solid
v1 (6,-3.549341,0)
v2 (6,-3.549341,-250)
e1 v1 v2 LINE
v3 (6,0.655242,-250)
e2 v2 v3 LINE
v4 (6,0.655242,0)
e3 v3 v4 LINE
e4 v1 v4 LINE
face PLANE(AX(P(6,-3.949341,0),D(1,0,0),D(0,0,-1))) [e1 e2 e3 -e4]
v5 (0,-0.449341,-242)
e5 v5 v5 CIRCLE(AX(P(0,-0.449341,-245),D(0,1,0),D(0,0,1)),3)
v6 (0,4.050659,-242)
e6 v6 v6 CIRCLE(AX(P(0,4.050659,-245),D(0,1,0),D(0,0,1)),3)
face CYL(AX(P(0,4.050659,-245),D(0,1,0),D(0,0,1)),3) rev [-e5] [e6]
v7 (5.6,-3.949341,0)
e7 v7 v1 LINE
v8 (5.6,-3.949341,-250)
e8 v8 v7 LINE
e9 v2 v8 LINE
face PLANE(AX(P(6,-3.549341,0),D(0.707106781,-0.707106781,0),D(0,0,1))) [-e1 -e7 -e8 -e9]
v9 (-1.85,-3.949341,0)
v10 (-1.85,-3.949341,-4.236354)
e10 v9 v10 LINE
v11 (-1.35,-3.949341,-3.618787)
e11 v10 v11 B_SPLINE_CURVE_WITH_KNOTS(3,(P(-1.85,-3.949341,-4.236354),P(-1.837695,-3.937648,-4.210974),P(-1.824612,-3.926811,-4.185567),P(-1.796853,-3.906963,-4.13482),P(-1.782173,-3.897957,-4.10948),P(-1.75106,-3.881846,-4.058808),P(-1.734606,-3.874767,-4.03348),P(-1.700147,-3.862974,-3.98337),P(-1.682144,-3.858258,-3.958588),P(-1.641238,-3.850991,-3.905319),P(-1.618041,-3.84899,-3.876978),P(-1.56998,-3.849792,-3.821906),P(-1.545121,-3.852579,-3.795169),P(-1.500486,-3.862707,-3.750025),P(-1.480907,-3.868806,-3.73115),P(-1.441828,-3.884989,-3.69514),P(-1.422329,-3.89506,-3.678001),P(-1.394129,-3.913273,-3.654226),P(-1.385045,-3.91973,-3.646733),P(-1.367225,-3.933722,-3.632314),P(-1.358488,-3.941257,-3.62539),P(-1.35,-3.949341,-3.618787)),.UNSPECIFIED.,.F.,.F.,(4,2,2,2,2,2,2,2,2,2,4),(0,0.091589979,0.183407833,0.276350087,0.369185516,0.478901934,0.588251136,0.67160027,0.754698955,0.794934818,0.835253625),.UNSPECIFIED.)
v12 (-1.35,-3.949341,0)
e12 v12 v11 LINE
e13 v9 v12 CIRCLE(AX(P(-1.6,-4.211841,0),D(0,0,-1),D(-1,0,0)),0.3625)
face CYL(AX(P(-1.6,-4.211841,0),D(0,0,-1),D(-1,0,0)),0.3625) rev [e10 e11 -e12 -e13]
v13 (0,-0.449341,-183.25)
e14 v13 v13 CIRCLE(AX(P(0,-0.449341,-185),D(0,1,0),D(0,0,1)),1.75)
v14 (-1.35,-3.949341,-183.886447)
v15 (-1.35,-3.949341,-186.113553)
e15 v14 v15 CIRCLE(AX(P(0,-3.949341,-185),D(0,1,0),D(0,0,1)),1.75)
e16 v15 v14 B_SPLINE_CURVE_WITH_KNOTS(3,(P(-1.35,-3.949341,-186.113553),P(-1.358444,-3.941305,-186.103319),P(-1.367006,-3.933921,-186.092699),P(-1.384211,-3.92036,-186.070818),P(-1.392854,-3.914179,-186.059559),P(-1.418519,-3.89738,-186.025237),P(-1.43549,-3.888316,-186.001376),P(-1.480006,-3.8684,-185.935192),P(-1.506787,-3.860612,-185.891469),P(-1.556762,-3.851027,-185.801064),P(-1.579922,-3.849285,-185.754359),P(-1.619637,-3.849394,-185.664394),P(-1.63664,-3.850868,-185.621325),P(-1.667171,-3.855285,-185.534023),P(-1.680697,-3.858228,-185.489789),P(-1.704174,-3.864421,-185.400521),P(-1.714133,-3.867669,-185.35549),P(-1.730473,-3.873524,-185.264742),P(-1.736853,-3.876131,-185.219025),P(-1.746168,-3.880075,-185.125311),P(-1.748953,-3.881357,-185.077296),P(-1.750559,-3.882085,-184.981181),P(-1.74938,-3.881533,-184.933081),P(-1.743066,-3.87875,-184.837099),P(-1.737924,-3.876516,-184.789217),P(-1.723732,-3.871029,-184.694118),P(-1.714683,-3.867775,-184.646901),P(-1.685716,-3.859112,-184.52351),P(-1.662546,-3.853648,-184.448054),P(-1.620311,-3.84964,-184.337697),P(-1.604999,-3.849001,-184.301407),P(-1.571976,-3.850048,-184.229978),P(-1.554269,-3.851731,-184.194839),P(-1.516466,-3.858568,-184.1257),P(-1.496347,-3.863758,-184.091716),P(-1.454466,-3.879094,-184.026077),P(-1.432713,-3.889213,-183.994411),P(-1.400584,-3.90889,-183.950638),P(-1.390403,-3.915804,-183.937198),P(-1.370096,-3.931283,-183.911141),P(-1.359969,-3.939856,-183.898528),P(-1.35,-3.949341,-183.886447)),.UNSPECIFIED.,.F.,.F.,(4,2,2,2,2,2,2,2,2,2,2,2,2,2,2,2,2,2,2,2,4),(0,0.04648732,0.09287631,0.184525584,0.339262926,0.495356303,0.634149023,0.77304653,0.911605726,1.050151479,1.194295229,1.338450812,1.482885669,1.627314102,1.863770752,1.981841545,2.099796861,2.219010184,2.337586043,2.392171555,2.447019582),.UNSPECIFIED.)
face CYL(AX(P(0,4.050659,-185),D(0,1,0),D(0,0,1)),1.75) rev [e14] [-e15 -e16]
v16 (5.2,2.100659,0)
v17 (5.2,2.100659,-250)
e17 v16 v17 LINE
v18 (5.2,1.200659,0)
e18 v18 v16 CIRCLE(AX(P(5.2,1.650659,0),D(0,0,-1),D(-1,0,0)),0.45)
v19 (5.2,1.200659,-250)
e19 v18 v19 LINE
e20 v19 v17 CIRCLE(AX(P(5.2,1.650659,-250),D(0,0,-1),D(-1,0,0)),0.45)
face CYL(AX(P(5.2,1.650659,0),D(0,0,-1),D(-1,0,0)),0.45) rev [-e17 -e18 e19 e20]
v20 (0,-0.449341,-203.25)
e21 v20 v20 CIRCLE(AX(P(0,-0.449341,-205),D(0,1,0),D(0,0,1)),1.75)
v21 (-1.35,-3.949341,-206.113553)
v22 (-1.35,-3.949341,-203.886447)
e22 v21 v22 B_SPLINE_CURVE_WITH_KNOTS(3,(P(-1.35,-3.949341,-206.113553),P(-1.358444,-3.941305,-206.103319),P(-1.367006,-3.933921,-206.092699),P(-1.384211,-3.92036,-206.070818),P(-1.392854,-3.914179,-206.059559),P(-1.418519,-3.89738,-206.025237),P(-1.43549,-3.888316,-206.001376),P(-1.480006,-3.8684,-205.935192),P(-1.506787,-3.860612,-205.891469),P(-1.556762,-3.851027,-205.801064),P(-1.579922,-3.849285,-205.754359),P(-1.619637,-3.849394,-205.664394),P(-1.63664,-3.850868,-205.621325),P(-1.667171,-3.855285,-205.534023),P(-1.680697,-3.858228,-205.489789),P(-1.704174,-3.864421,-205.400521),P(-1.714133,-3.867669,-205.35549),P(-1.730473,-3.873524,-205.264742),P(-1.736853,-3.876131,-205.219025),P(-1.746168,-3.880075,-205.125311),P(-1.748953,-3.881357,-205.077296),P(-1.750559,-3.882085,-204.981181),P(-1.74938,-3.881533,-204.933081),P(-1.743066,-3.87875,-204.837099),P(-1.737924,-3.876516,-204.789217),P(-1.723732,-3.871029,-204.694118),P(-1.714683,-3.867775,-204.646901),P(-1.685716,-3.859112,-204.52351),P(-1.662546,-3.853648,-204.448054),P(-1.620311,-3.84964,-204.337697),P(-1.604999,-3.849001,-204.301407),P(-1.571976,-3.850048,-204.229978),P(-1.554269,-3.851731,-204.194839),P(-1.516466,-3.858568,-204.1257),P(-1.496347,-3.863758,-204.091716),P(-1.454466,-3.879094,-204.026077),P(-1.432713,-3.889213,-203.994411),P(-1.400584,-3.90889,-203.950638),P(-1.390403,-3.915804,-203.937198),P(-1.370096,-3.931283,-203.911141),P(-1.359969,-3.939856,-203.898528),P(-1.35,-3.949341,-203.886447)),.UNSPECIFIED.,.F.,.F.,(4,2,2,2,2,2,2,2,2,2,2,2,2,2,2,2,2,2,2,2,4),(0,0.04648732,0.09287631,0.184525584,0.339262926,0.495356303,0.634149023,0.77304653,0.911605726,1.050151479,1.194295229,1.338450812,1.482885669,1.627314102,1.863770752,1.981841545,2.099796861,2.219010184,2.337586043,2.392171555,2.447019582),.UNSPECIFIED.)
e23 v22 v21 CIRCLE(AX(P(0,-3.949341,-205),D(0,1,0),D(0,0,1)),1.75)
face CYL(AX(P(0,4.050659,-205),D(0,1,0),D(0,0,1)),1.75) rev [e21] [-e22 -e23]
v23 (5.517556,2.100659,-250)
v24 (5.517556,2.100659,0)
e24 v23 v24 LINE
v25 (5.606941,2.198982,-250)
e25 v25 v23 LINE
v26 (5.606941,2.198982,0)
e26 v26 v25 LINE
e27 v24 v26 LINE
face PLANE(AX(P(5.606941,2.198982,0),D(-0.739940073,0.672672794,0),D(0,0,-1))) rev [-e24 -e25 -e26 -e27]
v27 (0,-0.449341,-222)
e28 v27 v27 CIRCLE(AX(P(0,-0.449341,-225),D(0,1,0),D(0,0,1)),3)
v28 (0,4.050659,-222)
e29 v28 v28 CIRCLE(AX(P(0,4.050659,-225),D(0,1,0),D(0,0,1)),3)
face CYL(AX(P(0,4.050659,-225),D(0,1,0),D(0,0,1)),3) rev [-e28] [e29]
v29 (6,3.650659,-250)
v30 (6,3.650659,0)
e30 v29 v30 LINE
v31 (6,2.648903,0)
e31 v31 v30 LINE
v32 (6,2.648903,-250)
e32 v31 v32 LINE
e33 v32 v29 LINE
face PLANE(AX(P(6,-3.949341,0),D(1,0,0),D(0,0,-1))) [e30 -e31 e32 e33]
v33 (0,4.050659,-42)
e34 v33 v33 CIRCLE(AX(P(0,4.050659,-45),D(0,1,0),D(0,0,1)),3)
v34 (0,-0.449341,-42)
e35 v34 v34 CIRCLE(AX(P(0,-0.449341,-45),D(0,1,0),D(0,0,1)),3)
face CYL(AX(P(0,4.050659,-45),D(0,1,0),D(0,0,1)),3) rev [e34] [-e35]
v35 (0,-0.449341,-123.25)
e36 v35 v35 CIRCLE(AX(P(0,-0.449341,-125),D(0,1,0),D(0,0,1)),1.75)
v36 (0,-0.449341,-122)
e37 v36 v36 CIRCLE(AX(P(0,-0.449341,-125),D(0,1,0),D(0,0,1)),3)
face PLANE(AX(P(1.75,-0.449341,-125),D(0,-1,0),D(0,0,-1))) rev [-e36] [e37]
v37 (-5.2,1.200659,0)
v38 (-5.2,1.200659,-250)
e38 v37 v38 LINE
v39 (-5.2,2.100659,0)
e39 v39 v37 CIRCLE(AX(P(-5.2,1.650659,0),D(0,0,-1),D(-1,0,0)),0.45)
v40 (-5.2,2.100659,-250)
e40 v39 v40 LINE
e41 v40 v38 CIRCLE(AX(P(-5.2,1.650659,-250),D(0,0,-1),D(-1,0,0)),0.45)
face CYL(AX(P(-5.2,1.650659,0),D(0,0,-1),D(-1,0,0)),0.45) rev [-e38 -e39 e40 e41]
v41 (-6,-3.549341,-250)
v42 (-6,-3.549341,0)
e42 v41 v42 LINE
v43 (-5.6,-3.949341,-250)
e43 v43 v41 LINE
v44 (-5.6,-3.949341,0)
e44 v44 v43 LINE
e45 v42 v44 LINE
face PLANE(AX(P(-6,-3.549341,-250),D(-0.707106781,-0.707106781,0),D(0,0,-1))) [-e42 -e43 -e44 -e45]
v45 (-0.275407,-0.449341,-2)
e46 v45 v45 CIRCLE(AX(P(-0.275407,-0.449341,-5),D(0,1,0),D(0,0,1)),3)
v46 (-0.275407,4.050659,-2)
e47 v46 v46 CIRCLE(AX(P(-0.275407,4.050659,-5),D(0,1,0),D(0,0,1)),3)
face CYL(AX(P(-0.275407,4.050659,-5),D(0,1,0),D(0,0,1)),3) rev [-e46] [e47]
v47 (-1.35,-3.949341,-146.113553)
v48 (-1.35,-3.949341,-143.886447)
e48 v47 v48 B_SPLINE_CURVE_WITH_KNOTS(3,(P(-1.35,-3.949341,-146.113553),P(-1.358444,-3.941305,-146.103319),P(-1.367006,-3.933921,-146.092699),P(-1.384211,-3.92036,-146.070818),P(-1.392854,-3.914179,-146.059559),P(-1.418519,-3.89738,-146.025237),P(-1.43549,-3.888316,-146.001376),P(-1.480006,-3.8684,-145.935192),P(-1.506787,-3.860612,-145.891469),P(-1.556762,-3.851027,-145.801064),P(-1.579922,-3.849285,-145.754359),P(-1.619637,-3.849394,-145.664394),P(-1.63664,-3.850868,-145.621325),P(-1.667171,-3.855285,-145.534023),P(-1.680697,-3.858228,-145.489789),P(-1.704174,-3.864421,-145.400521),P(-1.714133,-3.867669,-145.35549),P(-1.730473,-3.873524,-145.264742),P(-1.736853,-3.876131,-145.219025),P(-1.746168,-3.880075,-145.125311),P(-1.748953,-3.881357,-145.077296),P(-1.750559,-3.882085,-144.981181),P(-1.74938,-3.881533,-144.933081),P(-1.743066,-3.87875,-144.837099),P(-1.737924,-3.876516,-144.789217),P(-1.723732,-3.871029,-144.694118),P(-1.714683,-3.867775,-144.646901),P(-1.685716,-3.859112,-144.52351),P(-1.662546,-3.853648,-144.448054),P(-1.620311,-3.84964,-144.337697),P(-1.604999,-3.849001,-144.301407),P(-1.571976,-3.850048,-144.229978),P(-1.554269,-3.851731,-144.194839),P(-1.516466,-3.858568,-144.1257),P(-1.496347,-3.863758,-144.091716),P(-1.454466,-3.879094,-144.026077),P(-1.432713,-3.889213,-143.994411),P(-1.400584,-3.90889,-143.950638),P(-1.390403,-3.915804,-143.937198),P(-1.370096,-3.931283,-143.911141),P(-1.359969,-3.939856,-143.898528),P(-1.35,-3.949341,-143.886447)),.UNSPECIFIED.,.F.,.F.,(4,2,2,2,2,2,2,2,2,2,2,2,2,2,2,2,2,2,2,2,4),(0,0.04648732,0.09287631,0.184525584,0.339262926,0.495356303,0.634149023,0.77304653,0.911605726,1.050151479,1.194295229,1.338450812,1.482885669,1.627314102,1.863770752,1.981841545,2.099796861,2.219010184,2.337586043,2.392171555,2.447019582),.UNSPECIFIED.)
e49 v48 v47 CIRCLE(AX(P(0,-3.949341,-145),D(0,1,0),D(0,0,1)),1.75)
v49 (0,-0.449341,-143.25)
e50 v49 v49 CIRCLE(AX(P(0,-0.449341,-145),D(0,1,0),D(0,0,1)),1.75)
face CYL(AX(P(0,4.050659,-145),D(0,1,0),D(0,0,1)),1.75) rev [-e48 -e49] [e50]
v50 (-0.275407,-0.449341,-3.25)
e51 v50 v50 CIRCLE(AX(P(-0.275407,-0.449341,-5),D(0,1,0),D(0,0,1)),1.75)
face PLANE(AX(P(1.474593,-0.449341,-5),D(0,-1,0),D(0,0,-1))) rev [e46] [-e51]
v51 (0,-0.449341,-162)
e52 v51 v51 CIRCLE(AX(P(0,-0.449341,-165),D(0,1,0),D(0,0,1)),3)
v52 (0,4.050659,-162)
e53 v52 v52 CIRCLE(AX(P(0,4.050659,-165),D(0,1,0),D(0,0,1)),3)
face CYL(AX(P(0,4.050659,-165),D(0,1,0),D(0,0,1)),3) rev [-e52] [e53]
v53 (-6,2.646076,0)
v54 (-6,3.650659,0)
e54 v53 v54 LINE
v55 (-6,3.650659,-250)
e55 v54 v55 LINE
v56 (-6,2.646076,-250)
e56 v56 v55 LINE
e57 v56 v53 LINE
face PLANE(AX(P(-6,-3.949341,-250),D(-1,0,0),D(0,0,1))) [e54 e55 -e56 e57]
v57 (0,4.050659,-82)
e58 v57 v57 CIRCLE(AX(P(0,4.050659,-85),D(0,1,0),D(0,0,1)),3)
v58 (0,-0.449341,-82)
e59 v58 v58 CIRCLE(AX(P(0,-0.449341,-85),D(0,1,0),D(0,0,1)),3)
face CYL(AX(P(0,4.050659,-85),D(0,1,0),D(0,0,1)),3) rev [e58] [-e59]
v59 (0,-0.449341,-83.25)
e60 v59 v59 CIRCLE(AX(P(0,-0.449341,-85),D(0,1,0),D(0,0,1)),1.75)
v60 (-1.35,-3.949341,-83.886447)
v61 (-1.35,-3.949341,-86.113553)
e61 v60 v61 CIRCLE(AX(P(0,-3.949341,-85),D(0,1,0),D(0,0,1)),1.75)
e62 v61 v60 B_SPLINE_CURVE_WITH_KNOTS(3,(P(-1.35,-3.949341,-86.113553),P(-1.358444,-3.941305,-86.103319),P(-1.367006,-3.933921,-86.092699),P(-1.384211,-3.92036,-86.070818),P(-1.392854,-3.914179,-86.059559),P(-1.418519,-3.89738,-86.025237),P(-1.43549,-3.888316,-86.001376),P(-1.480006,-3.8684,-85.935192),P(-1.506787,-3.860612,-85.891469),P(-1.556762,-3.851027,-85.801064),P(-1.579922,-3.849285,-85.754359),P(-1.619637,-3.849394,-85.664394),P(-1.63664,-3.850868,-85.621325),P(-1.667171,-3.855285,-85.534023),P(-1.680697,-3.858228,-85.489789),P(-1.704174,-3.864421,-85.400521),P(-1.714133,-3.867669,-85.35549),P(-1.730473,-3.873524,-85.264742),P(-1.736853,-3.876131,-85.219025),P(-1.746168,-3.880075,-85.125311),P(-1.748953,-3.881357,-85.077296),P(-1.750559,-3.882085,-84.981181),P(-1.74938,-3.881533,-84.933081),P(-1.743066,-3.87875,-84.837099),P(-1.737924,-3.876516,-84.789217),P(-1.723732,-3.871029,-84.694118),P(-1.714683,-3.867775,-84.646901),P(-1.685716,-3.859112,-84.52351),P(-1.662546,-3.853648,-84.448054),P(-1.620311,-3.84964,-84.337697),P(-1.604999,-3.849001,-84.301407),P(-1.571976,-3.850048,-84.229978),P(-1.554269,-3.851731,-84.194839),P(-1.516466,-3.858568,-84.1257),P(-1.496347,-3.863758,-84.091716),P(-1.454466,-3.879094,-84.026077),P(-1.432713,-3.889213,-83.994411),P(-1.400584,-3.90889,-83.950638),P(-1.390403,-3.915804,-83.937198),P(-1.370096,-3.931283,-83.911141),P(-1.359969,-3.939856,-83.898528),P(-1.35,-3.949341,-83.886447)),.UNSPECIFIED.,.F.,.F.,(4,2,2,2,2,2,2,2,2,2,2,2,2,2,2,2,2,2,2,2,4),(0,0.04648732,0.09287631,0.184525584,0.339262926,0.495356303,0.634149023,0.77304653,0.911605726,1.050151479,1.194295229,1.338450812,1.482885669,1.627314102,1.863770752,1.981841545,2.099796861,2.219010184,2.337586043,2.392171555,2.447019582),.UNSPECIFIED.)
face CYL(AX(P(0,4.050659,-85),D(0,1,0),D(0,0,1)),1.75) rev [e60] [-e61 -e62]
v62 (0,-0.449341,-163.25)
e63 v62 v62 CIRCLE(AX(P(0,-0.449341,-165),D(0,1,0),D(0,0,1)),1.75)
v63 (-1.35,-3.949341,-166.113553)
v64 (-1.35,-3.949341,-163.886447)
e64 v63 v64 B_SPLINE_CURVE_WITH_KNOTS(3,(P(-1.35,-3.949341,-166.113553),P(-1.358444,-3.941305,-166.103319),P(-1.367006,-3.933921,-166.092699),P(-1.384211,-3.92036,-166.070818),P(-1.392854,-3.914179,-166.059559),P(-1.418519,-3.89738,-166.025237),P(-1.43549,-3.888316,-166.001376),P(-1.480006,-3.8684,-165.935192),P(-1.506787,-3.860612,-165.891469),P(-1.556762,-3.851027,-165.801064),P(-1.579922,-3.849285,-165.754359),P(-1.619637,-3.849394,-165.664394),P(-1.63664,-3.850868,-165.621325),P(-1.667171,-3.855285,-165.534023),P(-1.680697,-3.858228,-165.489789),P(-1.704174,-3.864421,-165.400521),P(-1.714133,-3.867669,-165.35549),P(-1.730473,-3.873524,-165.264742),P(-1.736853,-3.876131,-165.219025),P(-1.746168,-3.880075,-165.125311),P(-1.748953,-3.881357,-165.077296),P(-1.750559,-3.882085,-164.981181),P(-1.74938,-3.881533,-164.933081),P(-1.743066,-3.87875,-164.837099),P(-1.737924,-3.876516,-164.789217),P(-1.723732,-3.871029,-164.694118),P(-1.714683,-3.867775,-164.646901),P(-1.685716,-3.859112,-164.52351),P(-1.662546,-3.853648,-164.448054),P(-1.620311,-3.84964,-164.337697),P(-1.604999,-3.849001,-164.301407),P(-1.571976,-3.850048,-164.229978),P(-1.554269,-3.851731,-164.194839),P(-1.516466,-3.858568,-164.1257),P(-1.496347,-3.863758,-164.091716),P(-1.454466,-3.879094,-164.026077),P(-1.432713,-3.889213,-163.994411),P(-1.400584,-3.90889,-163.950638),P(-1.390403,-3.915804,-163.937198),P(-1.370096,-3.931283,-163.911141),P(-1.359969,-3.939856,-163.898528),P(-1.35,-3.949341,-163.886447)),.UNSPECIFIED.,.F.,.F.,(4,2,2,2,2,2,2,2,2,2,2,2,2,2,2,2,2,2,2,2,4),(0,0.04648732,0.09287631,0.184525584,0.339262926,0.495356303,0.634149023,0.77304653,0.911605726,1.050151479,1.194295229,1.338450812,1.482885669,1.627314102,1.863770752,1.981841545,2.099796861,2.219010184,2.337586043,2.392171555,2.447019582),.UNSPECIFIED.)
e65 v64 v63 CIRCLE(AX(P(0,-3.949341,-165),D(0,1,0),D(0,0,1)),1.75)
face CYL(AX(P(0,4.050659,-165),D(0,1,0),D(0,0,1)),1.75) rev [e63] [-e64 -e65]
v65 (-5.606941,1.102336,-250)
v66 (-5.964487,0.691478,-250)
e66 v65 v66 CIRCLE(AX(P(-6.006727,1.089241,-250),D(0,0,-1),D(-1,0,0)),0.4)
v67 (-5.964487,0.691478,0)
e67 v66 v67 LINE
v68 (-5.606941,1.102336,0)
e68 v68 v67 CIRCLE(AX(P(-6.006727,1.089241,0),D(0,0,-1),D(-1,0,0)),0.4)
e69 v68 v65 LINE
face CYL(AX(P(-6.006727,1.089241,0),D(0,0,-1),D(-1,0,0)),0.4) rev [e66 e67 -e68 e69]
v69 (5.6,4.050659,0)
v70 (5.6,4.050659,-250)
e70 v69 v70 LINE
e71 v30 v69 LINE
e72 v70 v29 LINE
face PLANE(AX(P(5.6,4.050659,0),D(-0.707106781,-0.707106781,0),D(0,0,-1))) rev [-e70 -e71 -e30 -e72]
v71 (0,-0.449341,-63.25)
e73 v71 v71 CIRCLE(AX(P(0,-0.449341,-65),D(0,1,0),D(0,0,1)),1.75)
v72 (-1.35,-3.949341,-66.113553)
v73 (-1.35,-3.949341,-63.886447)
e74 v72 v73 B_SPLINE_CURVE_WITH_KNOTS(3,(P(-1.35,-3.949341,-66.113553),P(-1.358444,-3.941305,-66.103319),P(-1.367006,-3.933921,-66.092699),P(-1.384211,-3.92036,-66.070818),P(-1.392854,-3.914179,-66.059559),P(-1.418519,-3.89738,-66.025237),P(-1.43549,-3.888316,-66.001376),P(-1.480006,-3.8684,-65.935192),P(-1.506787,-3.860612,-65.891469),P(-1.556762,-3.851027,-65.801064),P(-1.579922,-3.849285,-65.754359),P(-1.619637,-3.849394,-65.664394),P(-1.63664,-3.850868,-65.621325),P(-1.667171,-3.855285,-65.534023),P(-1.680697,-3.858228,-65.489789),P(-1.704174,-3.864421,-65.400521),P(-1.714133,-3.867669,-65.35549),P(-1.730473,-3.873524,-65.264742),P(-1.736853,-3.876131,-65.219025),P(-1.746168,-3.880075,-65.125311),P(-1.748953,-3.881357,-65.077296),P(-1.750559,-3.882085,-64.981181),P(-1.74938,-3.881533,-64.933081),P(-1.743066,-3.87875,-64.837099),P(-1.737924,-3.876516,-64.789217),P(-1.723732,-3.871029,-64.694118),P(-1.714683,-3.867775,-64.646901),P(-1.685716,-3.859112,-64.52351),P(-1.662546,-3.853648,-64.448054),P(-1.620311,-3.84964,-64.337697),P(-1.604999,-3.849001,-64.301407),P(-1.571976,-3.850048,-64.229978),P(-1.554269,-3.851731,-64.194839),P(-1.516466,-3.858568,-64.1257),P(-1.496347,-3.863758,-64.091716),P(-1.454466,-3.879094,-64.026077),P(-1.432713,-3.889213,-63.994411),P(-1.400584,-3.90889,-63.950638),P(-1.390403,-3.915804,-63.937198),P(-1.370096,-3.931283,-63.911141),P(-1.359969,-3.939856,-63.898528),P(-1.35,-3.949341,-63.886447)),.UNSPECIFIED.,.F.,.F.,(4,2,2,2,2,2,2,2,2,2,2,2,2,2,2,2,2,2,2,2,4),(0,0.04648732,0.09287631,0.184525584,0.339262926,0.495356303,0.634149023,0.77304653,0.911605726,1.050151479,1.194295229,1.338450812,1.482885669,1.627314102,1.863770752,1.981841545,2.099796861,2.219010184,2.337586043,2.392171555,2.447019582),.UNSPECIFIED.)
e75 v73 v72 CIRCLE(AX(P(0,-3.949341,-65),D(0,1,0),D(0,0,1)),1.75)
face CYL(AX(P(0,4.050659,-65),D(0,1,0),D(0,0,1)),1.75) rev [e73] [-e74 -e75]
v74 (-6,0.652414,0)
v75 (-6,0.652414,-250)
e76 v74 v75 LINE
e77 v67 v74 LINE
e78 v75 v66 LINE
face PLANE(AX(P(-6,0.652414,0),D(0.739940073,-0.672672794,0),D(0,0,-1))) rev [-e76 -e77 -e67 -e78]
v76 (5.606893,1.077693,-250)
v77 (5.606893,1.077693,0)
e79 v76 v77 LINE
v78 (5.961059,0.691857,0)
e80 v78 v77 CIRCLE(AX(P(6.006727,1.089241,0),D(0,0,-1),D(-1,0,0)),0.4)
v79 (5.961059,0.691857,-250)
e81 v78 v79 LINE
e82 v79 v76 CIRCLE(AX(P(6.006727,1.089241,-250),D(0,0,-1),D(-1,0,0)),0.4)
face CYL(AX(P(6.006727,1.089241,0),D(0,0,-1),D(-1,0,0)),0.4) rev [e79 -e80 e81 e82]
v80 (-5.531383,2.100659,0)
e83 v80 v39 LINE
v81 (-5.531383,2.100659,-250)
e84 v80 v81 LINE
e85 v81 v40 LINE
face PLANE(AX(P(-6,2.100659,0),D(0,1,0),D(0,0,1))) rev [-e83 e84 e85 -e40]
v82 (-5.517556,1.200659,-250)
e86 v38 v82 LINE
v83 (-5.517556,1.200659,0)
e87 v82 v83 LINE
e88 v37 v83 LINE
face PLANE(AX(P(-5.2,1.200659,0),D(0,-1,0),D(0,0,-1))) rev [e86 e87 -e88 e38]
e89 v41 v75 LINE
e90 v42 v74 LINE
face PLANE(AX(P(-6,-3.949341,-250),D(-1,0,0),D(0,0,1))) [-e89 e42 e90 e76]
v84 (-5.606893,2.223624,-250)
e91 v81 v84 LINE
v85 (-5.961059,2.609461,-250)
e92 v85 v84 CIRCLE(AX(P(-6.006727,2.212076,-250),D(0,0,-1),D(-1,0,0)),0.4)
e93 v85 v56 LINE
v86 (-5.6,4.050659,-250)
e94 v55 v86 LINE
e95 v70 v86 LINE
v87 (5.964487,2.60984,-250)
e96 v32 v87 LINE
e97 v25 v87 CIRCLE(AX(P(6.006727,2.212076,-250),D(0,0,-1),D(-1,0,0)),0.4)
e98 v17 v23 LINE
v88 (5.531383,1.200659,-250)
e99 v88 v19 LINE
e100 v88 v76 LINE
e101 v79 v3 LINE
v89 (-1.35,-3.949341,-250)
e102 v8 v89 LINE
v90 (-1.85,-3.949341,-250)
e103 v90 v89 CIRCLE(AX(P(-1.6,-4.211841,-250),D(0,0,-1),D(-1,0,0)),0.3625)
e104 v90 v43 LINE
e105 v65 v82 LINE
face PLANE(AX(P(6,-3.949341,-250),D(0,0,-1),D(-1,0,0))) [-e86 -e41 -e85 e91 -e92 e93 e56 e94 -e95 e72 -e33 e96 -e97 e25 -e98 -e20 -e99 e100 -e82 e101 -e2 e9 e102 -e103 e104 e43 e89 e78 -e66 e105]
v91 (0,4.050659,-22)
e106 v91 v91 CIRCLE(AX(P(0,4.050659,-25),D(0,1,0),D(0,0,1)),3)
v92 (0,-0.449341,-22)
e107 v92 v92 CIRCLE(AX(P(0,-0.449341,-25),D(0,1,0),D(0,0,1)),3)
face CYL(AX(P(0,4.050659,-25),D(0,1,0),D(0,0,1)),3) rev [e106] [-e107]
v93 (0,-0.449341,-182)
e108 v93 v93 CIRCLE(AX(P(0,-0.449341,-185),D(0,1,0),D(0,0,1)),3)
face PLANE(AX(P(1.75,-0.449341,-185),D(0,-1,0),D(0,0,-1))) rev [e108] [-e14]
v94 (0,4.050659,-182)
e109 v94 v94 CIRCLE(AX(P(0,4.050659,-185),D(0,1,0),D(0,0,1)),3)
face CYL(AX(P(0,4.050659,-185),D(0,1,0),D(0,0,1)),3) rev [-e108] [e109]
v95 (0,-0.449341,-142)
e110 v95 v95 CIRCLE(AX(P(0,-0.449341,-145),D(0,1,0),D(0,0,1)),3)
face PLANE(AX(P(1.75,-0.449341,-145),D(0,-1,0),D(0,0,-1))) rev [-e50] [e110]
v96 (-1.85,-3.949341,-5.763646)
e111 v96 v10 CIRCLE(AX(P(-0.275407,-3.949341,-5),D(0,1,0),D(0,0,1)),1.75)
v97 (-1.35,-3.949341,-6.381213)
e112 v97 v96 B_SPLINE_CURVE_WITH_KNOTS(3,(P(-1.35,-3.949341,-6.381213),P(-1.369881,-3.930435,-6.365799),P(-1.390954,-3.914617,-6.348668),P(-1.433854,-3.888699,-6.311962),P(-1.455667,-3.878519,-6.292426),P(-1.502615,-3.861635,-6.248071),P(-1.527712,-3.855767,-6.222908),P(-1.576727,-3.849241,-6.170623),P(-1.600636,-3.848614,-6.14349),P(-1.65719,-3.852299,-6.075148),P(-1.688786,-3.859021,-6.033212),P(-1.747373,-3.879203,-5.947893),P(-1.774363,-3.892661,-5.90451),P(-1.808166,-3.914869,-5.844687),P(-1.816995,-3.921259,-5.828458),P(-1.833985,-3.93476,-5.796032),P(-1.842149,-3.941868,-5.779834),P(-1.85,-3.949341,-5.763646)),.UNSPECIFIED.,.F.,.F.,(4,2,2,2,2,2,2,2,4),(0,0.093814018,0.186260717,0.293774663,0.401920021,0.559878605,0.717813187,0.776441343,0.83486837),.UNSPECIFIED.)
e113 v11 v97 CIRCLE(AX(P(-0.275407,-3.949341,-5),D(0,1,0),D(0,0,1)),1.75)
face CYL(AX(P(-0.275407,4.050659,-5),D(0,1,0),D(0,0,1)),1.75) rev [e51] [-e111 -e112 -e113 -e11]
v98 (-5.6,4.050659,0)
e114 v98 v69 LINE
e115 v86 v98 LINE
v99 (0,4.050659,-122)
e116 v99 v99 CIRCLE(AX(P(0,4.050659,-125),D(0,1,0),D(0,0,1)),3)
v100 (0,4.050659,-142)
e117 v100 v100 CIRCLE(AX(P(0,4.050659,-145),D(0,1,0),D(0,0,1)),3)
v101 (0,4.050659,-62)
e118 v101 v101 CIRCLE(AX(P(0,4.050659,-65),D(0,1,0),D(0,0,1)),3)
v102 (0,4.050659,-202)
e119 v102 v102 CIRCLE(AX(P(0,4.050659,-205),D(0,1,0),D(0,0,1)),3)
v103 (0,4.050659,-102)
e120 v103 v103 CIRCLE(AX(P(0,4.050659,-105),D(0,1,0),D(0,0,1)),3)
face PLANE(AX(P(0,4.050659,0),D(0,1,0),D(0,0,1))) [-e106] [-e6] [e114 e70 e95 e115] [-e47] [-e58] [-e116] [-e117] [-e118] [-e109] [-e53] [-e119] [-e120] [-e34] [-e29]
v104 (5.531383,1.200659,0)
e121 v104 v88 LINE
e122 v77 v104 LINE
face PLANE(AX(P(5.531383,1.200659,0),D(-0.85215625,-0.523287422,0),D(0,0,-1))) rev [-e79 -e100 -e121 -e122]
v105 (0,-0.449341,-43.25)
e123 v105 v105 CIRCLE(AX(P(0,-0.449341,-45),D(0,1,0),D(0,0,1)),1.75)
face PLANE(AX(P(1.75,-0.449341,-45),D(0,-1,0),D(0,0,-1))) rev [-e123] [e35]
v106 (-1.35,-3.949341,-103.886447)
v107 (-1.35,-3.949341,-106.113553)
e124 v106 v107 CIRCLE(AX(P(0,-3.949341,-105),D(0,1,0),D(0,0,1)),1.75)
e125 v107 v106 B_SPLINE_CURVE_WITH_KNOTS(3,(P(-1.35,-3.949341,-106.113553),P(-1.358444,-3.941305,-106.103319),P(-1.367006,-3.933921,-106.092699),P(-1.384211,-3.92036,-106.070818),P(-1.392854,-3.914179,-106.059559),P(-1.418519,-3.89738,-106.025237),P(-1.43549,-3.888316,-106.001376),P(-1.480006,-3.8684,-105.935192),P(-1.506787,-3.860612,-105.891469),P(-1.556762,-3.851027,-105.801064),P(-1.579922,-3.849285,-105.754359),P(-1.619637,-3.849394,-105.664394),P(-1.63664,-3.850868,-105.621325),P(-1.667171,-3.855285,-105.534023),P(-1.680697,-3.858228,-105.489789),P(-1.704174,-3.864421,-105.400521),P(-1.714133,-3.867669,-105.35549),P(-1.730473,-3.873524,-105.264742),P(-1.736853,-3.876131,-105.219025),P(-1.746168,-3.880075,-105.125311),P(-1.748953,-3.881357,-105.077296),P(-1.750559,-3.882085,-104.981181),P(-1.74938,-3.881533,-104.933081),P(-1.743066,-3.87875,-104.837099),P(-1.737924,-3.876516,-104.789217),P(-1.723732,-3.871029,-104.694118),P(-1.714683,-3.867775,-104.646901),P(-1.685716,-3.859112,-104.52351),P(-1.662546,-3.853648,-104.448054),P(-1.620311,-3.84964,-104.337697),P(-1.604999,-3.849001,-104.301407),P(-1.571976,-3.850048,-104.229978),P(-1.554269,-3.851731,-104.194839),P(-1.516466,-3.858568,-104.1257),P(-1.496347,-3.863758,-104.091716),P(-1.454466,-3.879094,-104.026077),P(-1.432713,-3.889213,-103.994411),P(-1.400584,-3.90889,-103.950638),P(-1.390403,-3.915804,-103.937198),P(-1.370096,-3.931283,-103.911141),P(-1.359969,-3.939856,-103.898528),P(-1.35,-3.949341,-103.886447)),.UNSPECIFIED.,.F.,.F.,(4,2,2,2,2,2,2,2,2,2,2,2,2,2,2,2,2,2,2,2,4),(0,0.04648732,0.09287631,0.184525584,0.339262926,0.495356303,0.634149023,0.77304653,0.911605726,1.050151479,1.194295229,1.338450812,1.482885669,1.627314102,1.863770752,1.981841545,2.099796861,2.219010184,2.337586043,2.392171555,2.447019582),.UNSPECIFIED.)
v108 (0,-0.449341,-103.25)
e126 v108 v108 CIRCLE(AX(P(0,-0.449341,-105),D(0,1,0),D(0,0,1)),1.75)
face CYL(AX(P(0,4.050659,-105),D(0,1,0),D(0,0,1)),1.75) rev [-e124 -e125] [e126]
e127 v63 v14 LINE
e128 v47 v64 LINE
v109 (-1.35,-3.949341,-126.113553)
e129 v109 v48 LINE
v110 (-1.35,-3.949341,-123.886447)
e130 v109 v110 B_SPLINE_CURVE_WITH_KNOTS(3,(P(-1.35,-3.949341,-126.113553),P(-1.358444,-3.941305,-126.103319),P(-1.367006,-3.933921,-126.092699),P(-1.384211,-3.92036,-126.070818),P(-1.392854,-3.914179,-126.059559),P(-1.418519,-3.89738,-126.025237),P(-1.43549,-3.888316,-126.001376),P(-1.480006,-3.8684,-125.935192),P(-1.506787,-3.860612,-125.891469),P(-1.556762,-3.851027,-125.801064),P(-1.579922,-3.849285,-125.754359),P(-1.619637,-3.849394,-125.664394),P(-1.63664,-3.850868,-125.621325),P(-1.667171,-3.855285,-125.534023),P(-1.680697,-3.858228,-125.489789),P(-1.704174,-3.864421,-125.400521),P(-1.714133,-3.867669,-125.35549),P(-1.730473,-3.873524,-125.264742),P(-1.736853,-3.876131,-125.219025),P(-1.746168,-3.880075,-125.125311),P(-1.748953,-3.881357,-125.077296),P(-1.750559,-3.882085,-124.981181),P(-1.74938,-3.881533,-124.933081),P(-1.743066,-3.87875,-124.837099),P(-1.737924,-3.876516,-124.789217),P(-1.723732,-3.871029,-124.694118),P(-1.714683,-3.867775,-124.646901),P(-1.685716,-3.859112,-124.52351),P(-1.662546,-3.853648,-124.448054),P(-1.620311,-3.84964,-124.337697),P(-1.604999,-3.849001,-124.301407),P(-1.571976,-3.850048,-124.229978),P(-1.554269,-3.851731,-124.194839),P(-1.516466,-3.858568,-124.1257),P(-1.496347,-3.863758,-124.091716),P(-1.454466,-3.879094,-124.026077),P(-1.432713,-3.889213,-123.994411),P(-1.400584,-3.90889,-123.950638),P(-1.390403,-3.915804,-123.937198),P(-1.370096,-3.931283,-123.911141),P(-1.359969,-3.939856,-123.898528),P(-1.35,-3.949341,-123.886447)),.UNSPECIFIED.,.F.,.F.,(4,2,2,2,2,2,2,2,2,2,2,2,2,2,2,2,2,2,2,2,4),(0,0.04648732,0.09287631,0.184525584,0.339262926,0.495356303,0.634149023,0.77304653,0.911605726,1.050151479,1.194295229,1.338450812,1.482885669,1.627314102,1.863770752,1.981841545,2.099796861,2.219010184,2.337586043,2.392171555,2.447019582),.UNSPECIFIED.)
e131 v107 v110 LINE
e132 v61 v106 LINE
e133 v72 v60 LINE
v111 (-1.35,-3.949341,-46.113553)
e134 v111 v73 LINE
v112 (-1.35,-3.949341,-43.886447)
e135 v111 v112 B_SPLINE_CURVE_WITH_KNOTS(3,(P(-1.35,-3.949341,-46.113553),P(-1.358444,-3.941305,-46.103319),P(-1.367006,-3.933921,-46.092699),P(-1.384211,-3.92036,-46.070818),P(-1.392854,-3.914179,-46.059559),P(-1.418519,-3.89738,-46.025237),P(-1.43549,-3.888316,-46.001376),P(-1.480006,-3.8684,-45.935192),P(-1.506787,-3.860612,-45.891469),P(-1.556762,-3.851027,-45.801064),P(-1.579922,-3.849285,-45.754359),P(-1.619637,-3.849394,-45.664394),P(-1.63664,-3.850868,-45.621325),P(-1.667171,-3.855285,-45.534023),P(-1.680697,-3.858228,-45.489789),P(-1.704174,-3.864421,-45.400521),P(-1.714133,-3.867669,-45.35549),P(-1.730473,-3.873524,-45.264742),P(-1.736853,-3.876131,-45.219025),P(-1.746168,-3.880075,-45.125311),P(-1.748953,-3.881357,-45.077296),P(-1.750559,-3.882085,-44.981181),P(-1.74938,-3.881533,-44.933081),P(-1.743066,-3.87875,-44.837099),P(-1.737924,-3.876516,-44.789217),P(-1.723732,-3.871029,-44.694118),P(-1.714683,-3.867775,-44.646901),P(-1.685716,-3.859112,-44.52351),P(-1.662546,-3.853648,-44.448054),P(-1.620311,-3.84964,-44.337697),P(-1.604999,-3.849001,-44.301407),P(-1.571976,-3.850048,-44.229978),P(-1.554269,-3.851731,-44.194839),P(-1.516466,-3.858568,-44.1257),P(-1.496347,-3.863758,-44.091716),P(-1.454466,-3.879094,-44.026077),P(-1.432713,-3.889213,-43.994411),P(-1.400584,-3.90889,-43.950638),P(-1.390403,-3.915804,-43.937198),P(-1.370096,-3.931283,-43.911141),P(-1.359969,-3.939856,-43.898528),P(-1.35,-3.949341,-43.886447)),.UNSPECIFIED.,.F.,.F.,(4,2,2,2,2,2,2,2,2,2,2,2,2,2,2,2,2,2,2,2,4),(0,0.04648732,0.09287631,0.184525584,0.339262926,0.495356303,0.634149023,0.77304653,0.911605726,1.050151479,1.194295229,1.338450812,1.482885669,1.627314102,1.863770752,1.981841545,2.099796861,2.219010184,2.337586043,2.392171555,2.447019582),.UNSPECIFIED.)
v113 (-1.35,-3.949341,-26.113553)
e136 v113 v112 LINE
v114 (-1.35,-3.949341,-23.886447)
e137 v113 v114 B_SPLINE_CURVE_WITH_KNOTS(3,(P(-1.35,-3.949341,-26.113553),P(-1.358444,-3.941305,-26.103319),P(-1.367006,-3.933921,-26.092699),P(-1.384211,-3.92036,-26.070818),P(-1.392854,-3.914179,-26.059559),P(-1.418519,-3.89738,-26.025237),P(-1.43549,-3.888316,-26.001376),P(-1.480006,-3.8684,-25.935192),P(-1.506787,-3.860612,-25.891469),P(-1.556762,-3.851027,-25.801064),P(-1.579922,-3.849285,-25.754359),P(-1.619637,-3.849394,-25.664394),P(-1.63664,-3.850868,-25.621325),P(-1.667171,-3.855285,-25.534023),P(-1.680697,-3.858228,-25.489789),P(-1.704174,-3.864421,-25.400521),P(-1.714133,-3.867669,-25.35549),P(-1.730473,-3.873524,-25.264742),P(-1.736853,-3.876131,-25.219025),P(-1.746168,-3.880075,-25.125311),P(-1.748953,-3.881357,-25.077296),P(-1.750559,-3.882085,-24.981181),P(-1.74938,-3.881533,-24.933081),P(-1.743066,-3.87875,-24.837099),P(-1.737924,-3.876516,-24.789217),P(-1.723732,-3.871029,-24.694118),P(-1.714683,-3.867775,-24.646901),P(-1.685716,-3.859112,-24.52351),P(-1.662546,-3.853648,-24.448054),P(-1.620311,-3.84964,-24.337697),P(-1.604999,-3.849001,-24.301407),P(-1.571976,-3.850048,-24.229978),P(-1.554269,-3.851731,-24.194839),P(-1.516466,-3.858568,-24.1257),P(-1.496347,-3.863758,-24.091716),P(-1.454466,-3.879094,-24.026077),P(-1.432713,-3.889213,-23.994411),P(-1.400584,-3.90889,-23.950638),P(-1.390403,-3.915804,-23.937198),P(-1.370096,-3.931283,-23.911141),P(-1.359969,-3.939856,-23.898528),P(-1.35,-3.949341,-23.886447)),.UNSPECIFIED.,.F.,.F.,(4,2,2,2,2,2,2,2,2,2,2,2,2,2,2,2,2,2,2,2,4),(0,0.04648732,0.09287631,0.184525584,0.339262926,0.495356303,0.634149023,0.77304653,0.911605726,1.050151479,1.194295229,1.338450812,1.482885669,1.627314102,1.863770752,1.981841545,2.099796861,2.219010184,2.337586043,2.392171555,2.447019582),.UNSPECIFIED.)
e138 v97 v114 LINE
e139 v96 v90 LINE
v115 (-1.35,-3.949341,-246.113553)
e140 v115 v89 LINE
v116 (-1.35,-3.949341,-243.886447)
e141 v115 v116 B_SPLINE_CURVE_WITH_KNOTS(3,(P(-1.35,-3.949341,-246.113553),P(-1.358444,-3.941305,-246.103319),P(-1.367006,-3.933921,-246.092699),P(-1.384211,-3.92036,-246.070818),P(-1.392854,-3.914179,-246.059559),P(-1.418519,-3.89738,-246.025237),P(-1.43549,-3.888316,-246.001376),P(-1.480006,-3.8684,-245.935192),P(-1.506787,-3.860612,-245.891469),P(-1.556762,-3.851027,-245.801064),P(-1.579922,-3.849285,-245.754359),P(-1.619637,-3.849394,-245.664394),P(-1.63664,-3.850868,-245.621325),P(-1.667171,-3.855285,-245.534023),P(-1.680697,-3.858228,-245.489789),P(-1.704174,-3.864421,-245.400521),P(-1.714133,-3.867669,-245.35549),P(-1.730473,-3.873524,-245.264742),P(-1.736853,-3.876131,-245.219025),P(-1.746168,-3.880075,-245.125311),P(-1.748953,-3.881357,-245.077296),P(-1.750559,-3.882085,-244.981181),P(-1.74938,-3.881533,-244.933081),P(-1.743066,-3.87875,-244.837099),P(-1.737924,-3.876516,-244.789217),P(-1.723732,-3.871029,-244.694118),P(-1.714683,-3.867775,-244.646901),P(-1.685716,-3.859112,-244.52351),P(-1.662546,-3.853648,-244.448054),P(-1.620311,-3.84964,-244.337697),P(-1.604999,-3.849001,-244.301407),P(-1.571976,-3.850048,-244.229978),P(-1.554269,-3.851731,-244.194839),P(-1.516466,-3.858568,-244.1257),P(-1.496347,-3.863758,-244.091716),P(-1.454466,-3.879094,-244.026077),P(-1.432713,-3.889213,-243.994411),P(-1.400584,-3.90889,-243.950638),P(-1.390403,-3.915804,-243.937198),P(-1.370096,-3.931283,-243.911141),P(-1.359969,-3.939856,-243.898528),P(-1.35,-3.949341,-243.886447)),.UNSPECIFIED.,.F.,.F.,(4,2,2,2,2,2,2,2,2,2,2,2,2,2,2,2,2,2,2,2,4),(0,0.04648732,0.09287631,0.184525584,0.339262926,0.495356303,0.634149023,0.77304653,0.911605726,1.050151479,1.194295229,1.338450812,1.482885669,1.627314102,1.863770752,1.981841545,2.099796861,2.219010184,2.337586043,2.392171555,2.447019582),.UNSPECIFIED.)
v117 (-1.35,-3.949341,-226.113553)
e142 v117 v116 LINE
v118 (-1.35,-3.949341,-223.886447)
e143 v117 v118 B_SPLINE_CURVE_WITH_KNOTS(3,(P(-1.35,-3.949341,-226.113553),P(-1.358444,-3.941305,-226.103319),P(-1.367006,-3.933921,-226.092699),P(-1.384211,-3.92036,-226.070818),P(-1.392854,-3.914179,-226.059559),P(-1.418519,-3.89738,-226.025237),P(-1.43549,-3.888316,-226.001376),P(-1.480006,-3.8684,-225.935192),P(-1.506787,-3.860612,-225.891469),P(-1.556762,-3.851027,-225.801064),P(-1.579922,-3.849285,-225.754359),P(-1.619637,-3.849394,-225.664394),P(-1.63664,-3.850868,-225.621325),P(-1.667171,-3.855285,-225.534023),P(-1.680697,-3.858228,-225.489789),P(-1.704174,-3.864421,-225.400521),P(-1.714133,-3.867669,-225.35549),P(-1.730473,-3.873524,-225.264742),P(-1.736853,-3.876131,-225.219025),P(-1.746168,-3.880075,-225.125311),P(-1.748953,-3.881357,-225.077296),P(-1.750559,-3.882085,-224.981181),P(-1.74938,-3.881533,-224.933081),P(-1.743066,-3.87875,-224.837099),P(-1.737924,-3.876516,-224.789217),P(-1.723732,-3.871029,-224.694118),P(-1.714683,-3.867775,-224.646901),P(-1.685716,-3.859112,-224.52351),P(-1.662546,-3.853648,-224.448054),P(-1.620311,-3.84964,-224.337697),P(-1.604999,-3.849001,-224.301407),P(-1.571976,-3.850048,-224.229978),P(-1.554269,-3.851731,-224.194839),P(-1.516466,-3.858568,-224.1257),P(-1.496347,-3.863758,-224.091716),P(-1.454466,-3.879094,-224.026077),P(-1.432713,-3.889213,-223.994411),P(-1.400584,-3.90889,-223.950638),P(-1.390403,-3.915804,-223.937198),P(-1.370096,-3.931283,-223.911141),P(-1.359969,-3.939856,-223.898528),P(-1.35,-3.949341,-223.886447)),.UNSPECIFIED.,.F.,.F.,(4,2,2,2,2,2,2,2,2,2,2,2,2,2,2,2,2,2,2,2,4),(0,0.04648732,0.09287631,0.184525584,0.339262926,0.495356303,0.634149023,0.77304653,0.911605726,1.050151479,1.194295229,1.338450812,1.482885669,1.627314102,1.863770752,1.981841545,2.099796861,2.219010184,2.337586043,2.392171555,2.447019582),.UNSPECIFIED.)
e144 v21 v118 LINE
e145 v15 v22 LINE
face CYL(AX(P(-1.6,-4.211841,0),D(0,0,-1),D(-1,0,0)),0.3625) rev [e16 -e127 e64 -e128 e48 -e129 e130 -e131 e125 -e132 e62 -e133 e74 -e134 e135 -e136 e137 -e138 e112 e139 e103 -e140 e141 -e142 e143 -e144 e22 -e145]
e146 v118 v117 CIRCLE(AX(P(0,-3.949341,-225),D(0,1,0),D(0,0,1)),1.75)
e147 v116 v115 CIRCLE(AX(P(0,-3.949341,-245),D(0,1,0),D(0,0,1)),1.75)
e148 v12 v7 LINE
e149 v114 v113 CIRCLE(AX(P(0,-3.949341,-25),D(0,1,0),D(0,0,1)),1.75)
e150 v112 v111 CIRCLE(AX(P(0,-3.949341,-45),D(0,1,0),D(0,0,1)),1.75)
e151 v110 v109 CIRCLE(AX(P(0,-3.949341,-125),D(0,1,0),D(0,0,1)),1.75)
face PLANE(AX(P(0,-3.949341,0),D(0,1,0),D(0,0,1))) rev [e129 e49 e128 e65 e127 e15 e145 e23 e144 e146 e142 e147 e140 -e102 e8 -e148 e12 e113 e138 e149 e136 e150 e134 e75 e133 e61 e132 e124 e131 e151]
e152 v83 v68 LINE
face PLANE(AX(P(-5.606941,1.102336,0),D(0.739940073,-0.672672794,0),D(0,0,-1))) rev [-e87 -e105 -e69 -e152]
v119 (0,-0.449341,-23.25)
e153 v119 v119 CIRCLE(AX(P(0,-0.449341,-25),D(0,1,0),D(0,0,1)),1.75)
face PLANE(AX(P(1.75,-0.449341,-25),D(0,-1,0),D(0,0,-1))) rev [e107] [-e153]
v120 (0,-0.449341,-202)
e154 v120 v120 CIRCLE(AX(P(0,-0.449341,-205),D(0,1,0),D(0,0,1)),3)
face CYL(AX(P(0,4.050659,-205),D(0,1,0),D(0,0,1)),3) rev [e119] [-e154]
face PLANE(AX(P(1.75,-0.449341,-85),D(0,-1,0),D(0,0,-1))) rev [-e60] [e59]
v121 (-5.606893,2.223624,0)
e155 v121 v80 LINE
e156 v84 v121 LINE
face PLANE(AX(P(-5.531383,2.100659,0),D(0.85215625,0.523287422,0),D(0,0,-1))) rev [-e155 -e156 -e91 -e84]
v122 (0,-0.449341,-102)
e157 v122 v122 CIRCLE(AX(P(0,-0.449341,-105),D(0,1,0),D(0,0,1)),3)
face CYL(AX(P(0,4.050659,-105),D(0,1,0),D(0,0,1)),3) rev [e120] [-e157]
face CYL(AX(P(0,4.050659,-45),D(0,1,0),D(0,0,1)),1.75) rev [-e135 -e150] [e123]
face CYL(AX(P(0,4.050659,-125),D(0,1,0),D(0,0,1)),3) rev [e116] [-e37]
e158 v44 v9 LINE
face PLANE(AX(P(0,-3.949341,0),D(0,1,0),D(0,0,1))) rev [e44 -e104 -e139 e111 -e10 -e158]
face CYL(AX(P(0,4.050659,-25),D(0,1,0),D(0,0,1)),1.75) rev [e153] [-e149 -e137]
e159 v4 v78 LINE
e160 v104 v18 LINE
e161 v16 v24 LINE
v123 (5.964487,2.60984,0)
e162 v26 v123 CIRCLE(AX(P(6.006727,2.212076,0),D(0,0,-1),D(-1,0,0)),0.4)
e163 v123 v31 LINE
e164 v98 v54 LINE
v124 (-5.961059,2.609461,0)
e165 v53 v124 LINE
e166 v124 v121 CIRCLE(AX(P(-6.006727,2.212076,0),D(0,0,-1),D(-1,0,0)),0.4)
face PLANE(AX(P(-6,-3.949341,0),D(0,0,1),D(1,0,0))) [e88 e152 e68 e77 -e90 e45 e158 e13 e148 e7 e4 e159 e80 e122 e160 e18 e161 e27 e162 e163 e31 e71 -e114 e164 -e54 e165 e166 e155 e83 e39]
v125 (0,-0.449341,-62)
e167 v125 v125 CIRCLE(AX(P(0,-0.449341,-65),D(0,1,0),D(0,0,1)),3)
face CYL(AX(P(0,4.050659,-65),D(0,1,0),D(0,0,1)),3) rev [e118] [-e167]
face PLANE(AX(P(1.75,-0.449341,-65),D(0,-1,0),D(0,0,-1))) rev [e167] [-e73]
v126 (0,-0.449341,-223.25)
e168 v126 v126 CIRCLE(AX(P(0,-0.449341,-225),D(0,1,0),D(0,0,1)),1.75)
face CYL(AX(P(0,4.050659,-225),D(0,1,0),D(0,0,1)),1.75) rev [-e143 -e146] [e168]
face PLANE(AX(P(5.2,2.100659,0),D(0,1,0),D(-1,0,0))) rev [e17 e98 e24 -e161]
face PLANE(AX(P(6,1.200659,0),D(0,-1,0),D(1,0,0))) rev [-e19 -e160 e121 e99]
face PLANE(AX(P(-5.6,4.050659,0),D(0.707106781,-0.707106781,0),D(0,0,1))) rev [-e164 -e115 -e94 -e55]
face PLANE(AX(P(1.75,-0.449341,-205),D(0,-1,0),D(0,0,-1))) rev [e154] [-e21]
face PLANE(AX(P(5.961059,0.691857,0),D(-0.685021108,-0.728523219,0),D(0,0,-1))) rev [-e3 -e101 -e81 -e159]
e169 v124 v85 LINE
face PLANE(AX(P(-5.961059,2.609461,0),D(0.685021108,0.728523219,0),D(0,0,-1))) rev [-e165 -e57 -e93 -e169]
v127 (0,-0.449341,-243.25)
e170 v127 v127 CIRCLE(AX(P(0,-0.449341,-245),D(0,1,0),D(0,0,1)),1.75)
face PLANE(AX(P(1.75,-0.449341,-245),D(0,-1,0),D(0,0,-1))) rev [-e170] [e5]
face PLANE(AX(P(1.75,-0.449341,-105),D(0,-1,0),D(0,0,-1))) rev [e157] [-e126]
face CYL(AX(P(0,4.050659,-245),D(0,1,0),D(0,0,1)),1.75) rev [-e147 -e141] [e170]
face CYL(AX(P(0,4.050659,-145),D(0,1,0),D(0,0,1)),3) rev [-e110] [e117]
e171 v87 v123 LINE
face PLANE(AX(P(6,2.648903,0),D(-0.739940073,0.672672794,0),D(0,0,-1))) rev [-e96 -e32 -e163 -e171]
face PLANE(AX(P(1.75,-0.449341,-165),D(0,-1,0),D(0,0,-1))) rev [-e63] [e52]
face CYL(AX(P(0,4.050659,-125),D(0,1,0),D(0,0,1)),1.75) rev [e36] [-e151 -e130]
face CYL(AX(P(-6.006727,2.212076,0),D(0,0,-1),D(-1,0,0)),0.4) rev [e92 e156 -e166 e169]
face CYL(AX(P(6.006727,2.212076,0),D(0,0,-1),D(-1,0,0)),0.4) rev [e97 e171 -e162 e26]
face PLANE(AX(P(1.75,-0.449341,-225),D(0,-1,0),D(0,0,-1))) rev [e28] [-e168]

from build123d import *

# Parameters (mm, degrees)
CROQUIS1_W                                           = 12
CROQUIS1_H                                           = 250
SALIENTE_EXTRUIR1_DEPTH                              = 8
CORTAR_EXTRUIR1_DEPTH                                = 251.104793708
CORTAR_EXTRUIR2_DEPTH                                = 251.104793708
CORTAR_EXTRUIR3_DEPTH                                = 251.104793708
CORTAR_EXTRUIR4_DEPTH                                = 251.104793708
CORTAR_EXTRUIR5_DEPTH                                = 251.104793708
CORTAR_EXTRUIR6_DEPTH                                = 251.104793708
CORTAR_EXTRUIR7_DEPTH                                = 251.104793708
REFRENTADO_PARA_TORNILLO_CON_CABEZA_HEXA_D           = 3.5
REFRENTADO_PARA_TORNILLO_CON_CABEZA_HEXA_CBORE_D     = 6
REFRENTADO_PARA_TORNILLO_CON_CABEZA_HEXA_CBORE_DEPTH = 4.5
CHAFL_N1_SIZE                                        = 0.4
CHAFL_N2_SIZE                                        = 0.034056407
CHAFL_N2_SIZE_2                                      = 0.03688403
CHAFL_N3_SIZE                                        = 0.091173812
CHAFL_N3_SIZE_2                                      = 0.105000846


with BuildPart() as part:
    # Croquis1 → Saliente-Extruir1 (new body)
    with BuildSketch(Plane(origin=(0, 4.050658692, 0), x_dir=(1, 0, 0), z_dir=(0, 1, 0))):
        with Locations((0, 125)):
            Rectangle(CROQUIS1_W, CROQUIS1_H)
    extrude(amount=-SALIENTE_EXTRUIR1_DEPTH)

    # Croquis2 → Cortar-Extruir1 (cut, through all)
    with BuildSketch(Plane(origin=(0, 0, -250), x_dir=(-1, 0, 0), z_dir=(0, 0, -1))):
        with BuildLine():
            Line((1.35, -3.949341308), (1.85, -3.949341308))
            ThreePointArc((1.85, -3.949341308), (1.6, -3.849341308), (1.35, -3.949341308))
        make_face()
    extrude(amount=-CORTAR_EXTRUIR1_DEPTH, mode=Mode.SUBTRACT)

    # Croquis3 → Cortar-Extruir2 (cut, through all)
    with BuildSketch(Plane(origin=(0, 0, -250), x_dir=(-1, 0, 0), z_dir=(0, 0, -1))):
        with BuildLine():
            Line((-6, 2.100658692), (-6, 1.200658692))
            Line((-6, 1.200658692), (-5.2, 1.200658692))
            ThreePointArc((-5.2, 1.200658692), (-4.75, 1.650658692), (-5.2, 2.100658692))
            Line((-5.2, 2.100658692), (-6, 2.100658692))
        make_face()
    extrude(amount=-CORTAR_EXTRUIR2_DEPTH, mode=Mode.SUBTRACT)

    # Croquis4 → Cortar-Extruir3 (cut, through all)
    with BuildSketch(Plane(origin=(0, 0, -250), x_dir=(-1, 0, 0), z_dir=(0, 0, -1))):
        with BuildLine():
            Line((-5.622557264, 1.200658692), (-6, 1.200658692))
            Line((-6, 1.200658692), (-6, 0.689297919))
            ThreePointArc((-6, 0.689297919), (-5.684900038, 0.851696449), (-5.622557264, 1.200658692))
        make_face()
    extrude(amount=-CORTAR_EXTRUIR3_DEPTH, mode=Mode.SUBTRACT)

    # Croquis5 → Cortar-Extruir4 (cut, through all)
    with BuildSketch(Plane(origin=(0, 0, -250), x_dir=(-1, 0, 0), z_dir=(0, 0, -1))):
        with BuildLine():
            Line((-6, 2.612019466), (-6, 2.100658692))
            Line((-6, 2.100658692), (-5.622557264, 2.100658692))
            ThreePointArc((-5.622557264, 2.100658692), (-5.684900038, 2.449620935), (-6, 2.612019466))
        make_face()
    extrude(amount=-CORTAR_EXTRUIR4_DEPTH, mode=Mode.SUBTRACT)

    # Croquis6 → Cortar-Extruir5 (cut, through all)
    with BuildSketch(Plane(origin=(0, 0, -250), x_dir=(-1, 0, 0), z_dir=(0, 0, -1))):
        with BuildLine():
            Line((6, 1.200658692), (6, 2.100658692))
            Line((6, 2.100658692), (5.2, 2.100658692))
            ThreePointArc((5.2, 2.100658692), (4.75, 1.650658692), (5.2, 1.200658692))
            Line((5.2, 1.200658692), (6, 1.200658692))
        make_face()
    extrude(amount=-CORTAR_EXTRUIR5_DEPTH, mode=Mode.SUBTRACT)

    # Croquis7 → Cortar-Extruir6 (cut, through all)
    with BuildSketch(Plane(origin=(0, 0, -250), x_dir=(-1, 0, 0), z_dir=(0, 0, -1))):
        with BuildLine():
            Line((5.622557264, 2.100658692), (6, 2.100658692))
            Line((6, 2.100658692), (6, 2.612019466))
            ThreePointArc((6, 2.612019466), (5.684900038, 2.449620935), (5.622557264, 2.100658692))
        make_face()
    extrude(amount=-CORTAR_EXTRUIR6_DEPTH, mode=Mode.SUBTRACT)

    # Croquis8 → Cortar-Extruir7 (cut, through all)
    with BuildSketch(Plane(origin=(0, 0, -250), x_dir=(-1, 0, 0), z_dir=(0, 0, -1))):
        with BuildLine():
            Line((6, 0.689297919), (6, 1.200658692))
            Line((6, 1.200658692), (5.622557264, 1.200658692))
            ThreePointArc((5.622557264, 1.200658692), (5.684900038, 0.851696449), (6, 0.689297919))
        make_face()
    extrude(amount=-CORTAR_EXTRUIR7_DEPTH, mode=Mode.SUBTRACT)

    # Refrentado para tornillo con cabeza hexagonal de M31 (through all)
    with Locations(Plane(origin=(0, 4.050658692, 0), x_dir=(1, 0, 0), z_dir=(0, 1, 0))):
        with Locations((0, 45), (0, 65), (0, 85), (0, 105), (0, 125), (0, 145), (0, 165), (0, 185), (0, 205), (0, 225), (0, 245), (0, 25), (-0.275406539, 5)):
            CounterBoreHole(REFRENTADO_PARA_TORNILLO_CON_CABEZA_HEXA_D / 2, REFRENTADO_PARA_TORNILLO_CON_CABEZA_HEXA_CBORE_D / 2, REFRENTADO_PARA_TORNILLO_CON_CABEZA_HEXA_CBORE_DEPTH)

    # Chaflán1
    chafl_n1_edges = [part.edges().sort_by_distance(p)[0] for p in [
        (-6, -3.949341308, -125),
        (6, -3.949341308, -125),
        (-6, 4.050658692, -125),
        (6, 4.050658692, -125),
    ]]
    chamfer(chafl_n1_edges, length=CHAFL_N1_SIZE)

    # Chaflán2
    # the kernel refuses this chamfer: 0.03688403, 0.034056407 mm, written as the material it takes off along each edge
    with BuildSketch(Plane(origin=(6, 0.689297919, -250.100435582), x_dir=(-0.9978479381588691, 0.06557051404475742, 0), z_dir=(0, 0, 1))) as chafl_n2_piece_1:
        with BuildLine():
            Line((0.03902449, 0), (-CHAFL_N2_SIZE * 0.0655705141026, CHAFL_N2_SIZE * 0.997847939043))
            Line((-CHAFL_N2_SIZE * 0.0655705141026, CHAFL_N2_SIZE * 0.997847939043), (0, 0))
            ThreePointArc((0, 0), (0.020082989, 0.000475786), (0.03902449, 0))
        make_face()
    extrude(amount=250.200871164, mode=Mode.SUBTRACT)
    with BuildSketch(Plane(origin=(6, 2.612019466, -250.094971685), x_dir=(0, 1, 0), z_dir=(0, 0, 1))) as chafl_n2_piece_2:
        with BuildLine():
            Line((CHAFL_N2_SIZE_2 * 0.999999990825, 0), (-0.002179894, 0.035512658))
            ThreePointArc((-0.002179894, 0.035512658), (-0.000727719, 0.018309495), (0, 0))
            Line((0, 0), (CHAFL_N2_SIZE_2 * 0.999999990825, 0))
        make_face()
    extrude(amount=250.189943371, mode=Mode.SUBTRACT)
    with BuildSketch(Plane(origin=(-6, 2.612019466, -250.100435582), x_dir=(0, 1, 0), z_dir=(0, 0, 1))) as chafl_n2_piece_3:
        with BuildLine():
            Line((CHAFL_N2_SIZE, 0), (-0.002558856, -0.038940507))
            ThreePointArc((-0.002558856, -0.038940507), (-0.00084209, -0.020070966), (0, 0))
            Line((0, 0), (CHAFL_N2_SIZE, 0))
        make_face()
    extrude(amount=250.200871164, mode=Mode.SUBTRACT)
    with BuildSketch(Plane(origin=(-6, 0.689297919, -250.094971685), x_dir=(0.9981213351064977, 0.061268265890444186, 0), z_dir=(0, 0, 1))) as chafl_n2_piece_4:
        with BuildLine():
            Line((0.0355795, 0), (-CHAFL_N2_SIZE_2 * 0.0612682653277, -CHAFL_N2_SIZE_2 * 0.998121325949))
            Line((-CHAFL_N2_SIZE_2 * 0.0612682653277, -CHAFL_N2_SIZE_2 * 0.998121325949), (0, 0))
            ThreePointArc((0, 0), (0.018319684, -0.000395439), (0.0355795, 0))
        make_face()
    extrude(amount=250.189943371, mode=Mode.SUBTRACT)

    # Chaflán3
    # the kernel refuses this chamfer: 0.105000846, 0.091173812 mm, written as the material it takes off along each edge
    with BuildSketch(Plane(origin=(5.622557264, 1.200658692, -250.318147751), x_dir=(-0.1263625484615496, -0.991984126055605, 0), z_dir=(0, 0, 1)), Plane(origin=(-5.622557264, 2.100658692, -250.318147751), x_dir=(0.12636254846156672, 0.9919841260556028, 0), z_dir=(0, 0, 1))) as chafl_n3_piece_1:
        with BuildLine():
            Line((0.123959197, 0), (CHAFL_N3_SIZE * 0.126362548546, -CHAFL_N3_SIZE * 0.99198412672))
            Line((CHAFL_N3_SIZE * 0.126362548546, -CHAFL_N3_SIZE * 0.99198412672), (0, 0))
            ThreePointArc((0, 0), (0.063641461, -0.004827559), (0.123959197, 0))
        make_face()
    extrude(amount=250.636295502, mode=Mode.SUBTRACT)
    with BuildSketch(Plane(origin=(5.622557264, 2.100658692, -250.269677179), x_dir=(-1, 0, 0), z_dir=(0, 0, 1)), Plane(origin=(-5.622557264, 1.200658692, -250.269677179), x_dir=(1, 0, 0), z_dir=(0, 0, 1))) as chafl_n3_piece_2:
        with BuildLine():
            Line((CHAFL_N3_SIZE_2, 0), (0.015616157, -0.098323158))
            ThreePointArc((0.015616157, -0.098323158), (0.011085216, -0.04998658), (0, 0))
            Line((0, 0), (CHAFL_N3_SIZE_2, 0))
        make_face()
    extrude(amount=250.539354358, mode=Mode.SUBTRACT)


solid = part.part
